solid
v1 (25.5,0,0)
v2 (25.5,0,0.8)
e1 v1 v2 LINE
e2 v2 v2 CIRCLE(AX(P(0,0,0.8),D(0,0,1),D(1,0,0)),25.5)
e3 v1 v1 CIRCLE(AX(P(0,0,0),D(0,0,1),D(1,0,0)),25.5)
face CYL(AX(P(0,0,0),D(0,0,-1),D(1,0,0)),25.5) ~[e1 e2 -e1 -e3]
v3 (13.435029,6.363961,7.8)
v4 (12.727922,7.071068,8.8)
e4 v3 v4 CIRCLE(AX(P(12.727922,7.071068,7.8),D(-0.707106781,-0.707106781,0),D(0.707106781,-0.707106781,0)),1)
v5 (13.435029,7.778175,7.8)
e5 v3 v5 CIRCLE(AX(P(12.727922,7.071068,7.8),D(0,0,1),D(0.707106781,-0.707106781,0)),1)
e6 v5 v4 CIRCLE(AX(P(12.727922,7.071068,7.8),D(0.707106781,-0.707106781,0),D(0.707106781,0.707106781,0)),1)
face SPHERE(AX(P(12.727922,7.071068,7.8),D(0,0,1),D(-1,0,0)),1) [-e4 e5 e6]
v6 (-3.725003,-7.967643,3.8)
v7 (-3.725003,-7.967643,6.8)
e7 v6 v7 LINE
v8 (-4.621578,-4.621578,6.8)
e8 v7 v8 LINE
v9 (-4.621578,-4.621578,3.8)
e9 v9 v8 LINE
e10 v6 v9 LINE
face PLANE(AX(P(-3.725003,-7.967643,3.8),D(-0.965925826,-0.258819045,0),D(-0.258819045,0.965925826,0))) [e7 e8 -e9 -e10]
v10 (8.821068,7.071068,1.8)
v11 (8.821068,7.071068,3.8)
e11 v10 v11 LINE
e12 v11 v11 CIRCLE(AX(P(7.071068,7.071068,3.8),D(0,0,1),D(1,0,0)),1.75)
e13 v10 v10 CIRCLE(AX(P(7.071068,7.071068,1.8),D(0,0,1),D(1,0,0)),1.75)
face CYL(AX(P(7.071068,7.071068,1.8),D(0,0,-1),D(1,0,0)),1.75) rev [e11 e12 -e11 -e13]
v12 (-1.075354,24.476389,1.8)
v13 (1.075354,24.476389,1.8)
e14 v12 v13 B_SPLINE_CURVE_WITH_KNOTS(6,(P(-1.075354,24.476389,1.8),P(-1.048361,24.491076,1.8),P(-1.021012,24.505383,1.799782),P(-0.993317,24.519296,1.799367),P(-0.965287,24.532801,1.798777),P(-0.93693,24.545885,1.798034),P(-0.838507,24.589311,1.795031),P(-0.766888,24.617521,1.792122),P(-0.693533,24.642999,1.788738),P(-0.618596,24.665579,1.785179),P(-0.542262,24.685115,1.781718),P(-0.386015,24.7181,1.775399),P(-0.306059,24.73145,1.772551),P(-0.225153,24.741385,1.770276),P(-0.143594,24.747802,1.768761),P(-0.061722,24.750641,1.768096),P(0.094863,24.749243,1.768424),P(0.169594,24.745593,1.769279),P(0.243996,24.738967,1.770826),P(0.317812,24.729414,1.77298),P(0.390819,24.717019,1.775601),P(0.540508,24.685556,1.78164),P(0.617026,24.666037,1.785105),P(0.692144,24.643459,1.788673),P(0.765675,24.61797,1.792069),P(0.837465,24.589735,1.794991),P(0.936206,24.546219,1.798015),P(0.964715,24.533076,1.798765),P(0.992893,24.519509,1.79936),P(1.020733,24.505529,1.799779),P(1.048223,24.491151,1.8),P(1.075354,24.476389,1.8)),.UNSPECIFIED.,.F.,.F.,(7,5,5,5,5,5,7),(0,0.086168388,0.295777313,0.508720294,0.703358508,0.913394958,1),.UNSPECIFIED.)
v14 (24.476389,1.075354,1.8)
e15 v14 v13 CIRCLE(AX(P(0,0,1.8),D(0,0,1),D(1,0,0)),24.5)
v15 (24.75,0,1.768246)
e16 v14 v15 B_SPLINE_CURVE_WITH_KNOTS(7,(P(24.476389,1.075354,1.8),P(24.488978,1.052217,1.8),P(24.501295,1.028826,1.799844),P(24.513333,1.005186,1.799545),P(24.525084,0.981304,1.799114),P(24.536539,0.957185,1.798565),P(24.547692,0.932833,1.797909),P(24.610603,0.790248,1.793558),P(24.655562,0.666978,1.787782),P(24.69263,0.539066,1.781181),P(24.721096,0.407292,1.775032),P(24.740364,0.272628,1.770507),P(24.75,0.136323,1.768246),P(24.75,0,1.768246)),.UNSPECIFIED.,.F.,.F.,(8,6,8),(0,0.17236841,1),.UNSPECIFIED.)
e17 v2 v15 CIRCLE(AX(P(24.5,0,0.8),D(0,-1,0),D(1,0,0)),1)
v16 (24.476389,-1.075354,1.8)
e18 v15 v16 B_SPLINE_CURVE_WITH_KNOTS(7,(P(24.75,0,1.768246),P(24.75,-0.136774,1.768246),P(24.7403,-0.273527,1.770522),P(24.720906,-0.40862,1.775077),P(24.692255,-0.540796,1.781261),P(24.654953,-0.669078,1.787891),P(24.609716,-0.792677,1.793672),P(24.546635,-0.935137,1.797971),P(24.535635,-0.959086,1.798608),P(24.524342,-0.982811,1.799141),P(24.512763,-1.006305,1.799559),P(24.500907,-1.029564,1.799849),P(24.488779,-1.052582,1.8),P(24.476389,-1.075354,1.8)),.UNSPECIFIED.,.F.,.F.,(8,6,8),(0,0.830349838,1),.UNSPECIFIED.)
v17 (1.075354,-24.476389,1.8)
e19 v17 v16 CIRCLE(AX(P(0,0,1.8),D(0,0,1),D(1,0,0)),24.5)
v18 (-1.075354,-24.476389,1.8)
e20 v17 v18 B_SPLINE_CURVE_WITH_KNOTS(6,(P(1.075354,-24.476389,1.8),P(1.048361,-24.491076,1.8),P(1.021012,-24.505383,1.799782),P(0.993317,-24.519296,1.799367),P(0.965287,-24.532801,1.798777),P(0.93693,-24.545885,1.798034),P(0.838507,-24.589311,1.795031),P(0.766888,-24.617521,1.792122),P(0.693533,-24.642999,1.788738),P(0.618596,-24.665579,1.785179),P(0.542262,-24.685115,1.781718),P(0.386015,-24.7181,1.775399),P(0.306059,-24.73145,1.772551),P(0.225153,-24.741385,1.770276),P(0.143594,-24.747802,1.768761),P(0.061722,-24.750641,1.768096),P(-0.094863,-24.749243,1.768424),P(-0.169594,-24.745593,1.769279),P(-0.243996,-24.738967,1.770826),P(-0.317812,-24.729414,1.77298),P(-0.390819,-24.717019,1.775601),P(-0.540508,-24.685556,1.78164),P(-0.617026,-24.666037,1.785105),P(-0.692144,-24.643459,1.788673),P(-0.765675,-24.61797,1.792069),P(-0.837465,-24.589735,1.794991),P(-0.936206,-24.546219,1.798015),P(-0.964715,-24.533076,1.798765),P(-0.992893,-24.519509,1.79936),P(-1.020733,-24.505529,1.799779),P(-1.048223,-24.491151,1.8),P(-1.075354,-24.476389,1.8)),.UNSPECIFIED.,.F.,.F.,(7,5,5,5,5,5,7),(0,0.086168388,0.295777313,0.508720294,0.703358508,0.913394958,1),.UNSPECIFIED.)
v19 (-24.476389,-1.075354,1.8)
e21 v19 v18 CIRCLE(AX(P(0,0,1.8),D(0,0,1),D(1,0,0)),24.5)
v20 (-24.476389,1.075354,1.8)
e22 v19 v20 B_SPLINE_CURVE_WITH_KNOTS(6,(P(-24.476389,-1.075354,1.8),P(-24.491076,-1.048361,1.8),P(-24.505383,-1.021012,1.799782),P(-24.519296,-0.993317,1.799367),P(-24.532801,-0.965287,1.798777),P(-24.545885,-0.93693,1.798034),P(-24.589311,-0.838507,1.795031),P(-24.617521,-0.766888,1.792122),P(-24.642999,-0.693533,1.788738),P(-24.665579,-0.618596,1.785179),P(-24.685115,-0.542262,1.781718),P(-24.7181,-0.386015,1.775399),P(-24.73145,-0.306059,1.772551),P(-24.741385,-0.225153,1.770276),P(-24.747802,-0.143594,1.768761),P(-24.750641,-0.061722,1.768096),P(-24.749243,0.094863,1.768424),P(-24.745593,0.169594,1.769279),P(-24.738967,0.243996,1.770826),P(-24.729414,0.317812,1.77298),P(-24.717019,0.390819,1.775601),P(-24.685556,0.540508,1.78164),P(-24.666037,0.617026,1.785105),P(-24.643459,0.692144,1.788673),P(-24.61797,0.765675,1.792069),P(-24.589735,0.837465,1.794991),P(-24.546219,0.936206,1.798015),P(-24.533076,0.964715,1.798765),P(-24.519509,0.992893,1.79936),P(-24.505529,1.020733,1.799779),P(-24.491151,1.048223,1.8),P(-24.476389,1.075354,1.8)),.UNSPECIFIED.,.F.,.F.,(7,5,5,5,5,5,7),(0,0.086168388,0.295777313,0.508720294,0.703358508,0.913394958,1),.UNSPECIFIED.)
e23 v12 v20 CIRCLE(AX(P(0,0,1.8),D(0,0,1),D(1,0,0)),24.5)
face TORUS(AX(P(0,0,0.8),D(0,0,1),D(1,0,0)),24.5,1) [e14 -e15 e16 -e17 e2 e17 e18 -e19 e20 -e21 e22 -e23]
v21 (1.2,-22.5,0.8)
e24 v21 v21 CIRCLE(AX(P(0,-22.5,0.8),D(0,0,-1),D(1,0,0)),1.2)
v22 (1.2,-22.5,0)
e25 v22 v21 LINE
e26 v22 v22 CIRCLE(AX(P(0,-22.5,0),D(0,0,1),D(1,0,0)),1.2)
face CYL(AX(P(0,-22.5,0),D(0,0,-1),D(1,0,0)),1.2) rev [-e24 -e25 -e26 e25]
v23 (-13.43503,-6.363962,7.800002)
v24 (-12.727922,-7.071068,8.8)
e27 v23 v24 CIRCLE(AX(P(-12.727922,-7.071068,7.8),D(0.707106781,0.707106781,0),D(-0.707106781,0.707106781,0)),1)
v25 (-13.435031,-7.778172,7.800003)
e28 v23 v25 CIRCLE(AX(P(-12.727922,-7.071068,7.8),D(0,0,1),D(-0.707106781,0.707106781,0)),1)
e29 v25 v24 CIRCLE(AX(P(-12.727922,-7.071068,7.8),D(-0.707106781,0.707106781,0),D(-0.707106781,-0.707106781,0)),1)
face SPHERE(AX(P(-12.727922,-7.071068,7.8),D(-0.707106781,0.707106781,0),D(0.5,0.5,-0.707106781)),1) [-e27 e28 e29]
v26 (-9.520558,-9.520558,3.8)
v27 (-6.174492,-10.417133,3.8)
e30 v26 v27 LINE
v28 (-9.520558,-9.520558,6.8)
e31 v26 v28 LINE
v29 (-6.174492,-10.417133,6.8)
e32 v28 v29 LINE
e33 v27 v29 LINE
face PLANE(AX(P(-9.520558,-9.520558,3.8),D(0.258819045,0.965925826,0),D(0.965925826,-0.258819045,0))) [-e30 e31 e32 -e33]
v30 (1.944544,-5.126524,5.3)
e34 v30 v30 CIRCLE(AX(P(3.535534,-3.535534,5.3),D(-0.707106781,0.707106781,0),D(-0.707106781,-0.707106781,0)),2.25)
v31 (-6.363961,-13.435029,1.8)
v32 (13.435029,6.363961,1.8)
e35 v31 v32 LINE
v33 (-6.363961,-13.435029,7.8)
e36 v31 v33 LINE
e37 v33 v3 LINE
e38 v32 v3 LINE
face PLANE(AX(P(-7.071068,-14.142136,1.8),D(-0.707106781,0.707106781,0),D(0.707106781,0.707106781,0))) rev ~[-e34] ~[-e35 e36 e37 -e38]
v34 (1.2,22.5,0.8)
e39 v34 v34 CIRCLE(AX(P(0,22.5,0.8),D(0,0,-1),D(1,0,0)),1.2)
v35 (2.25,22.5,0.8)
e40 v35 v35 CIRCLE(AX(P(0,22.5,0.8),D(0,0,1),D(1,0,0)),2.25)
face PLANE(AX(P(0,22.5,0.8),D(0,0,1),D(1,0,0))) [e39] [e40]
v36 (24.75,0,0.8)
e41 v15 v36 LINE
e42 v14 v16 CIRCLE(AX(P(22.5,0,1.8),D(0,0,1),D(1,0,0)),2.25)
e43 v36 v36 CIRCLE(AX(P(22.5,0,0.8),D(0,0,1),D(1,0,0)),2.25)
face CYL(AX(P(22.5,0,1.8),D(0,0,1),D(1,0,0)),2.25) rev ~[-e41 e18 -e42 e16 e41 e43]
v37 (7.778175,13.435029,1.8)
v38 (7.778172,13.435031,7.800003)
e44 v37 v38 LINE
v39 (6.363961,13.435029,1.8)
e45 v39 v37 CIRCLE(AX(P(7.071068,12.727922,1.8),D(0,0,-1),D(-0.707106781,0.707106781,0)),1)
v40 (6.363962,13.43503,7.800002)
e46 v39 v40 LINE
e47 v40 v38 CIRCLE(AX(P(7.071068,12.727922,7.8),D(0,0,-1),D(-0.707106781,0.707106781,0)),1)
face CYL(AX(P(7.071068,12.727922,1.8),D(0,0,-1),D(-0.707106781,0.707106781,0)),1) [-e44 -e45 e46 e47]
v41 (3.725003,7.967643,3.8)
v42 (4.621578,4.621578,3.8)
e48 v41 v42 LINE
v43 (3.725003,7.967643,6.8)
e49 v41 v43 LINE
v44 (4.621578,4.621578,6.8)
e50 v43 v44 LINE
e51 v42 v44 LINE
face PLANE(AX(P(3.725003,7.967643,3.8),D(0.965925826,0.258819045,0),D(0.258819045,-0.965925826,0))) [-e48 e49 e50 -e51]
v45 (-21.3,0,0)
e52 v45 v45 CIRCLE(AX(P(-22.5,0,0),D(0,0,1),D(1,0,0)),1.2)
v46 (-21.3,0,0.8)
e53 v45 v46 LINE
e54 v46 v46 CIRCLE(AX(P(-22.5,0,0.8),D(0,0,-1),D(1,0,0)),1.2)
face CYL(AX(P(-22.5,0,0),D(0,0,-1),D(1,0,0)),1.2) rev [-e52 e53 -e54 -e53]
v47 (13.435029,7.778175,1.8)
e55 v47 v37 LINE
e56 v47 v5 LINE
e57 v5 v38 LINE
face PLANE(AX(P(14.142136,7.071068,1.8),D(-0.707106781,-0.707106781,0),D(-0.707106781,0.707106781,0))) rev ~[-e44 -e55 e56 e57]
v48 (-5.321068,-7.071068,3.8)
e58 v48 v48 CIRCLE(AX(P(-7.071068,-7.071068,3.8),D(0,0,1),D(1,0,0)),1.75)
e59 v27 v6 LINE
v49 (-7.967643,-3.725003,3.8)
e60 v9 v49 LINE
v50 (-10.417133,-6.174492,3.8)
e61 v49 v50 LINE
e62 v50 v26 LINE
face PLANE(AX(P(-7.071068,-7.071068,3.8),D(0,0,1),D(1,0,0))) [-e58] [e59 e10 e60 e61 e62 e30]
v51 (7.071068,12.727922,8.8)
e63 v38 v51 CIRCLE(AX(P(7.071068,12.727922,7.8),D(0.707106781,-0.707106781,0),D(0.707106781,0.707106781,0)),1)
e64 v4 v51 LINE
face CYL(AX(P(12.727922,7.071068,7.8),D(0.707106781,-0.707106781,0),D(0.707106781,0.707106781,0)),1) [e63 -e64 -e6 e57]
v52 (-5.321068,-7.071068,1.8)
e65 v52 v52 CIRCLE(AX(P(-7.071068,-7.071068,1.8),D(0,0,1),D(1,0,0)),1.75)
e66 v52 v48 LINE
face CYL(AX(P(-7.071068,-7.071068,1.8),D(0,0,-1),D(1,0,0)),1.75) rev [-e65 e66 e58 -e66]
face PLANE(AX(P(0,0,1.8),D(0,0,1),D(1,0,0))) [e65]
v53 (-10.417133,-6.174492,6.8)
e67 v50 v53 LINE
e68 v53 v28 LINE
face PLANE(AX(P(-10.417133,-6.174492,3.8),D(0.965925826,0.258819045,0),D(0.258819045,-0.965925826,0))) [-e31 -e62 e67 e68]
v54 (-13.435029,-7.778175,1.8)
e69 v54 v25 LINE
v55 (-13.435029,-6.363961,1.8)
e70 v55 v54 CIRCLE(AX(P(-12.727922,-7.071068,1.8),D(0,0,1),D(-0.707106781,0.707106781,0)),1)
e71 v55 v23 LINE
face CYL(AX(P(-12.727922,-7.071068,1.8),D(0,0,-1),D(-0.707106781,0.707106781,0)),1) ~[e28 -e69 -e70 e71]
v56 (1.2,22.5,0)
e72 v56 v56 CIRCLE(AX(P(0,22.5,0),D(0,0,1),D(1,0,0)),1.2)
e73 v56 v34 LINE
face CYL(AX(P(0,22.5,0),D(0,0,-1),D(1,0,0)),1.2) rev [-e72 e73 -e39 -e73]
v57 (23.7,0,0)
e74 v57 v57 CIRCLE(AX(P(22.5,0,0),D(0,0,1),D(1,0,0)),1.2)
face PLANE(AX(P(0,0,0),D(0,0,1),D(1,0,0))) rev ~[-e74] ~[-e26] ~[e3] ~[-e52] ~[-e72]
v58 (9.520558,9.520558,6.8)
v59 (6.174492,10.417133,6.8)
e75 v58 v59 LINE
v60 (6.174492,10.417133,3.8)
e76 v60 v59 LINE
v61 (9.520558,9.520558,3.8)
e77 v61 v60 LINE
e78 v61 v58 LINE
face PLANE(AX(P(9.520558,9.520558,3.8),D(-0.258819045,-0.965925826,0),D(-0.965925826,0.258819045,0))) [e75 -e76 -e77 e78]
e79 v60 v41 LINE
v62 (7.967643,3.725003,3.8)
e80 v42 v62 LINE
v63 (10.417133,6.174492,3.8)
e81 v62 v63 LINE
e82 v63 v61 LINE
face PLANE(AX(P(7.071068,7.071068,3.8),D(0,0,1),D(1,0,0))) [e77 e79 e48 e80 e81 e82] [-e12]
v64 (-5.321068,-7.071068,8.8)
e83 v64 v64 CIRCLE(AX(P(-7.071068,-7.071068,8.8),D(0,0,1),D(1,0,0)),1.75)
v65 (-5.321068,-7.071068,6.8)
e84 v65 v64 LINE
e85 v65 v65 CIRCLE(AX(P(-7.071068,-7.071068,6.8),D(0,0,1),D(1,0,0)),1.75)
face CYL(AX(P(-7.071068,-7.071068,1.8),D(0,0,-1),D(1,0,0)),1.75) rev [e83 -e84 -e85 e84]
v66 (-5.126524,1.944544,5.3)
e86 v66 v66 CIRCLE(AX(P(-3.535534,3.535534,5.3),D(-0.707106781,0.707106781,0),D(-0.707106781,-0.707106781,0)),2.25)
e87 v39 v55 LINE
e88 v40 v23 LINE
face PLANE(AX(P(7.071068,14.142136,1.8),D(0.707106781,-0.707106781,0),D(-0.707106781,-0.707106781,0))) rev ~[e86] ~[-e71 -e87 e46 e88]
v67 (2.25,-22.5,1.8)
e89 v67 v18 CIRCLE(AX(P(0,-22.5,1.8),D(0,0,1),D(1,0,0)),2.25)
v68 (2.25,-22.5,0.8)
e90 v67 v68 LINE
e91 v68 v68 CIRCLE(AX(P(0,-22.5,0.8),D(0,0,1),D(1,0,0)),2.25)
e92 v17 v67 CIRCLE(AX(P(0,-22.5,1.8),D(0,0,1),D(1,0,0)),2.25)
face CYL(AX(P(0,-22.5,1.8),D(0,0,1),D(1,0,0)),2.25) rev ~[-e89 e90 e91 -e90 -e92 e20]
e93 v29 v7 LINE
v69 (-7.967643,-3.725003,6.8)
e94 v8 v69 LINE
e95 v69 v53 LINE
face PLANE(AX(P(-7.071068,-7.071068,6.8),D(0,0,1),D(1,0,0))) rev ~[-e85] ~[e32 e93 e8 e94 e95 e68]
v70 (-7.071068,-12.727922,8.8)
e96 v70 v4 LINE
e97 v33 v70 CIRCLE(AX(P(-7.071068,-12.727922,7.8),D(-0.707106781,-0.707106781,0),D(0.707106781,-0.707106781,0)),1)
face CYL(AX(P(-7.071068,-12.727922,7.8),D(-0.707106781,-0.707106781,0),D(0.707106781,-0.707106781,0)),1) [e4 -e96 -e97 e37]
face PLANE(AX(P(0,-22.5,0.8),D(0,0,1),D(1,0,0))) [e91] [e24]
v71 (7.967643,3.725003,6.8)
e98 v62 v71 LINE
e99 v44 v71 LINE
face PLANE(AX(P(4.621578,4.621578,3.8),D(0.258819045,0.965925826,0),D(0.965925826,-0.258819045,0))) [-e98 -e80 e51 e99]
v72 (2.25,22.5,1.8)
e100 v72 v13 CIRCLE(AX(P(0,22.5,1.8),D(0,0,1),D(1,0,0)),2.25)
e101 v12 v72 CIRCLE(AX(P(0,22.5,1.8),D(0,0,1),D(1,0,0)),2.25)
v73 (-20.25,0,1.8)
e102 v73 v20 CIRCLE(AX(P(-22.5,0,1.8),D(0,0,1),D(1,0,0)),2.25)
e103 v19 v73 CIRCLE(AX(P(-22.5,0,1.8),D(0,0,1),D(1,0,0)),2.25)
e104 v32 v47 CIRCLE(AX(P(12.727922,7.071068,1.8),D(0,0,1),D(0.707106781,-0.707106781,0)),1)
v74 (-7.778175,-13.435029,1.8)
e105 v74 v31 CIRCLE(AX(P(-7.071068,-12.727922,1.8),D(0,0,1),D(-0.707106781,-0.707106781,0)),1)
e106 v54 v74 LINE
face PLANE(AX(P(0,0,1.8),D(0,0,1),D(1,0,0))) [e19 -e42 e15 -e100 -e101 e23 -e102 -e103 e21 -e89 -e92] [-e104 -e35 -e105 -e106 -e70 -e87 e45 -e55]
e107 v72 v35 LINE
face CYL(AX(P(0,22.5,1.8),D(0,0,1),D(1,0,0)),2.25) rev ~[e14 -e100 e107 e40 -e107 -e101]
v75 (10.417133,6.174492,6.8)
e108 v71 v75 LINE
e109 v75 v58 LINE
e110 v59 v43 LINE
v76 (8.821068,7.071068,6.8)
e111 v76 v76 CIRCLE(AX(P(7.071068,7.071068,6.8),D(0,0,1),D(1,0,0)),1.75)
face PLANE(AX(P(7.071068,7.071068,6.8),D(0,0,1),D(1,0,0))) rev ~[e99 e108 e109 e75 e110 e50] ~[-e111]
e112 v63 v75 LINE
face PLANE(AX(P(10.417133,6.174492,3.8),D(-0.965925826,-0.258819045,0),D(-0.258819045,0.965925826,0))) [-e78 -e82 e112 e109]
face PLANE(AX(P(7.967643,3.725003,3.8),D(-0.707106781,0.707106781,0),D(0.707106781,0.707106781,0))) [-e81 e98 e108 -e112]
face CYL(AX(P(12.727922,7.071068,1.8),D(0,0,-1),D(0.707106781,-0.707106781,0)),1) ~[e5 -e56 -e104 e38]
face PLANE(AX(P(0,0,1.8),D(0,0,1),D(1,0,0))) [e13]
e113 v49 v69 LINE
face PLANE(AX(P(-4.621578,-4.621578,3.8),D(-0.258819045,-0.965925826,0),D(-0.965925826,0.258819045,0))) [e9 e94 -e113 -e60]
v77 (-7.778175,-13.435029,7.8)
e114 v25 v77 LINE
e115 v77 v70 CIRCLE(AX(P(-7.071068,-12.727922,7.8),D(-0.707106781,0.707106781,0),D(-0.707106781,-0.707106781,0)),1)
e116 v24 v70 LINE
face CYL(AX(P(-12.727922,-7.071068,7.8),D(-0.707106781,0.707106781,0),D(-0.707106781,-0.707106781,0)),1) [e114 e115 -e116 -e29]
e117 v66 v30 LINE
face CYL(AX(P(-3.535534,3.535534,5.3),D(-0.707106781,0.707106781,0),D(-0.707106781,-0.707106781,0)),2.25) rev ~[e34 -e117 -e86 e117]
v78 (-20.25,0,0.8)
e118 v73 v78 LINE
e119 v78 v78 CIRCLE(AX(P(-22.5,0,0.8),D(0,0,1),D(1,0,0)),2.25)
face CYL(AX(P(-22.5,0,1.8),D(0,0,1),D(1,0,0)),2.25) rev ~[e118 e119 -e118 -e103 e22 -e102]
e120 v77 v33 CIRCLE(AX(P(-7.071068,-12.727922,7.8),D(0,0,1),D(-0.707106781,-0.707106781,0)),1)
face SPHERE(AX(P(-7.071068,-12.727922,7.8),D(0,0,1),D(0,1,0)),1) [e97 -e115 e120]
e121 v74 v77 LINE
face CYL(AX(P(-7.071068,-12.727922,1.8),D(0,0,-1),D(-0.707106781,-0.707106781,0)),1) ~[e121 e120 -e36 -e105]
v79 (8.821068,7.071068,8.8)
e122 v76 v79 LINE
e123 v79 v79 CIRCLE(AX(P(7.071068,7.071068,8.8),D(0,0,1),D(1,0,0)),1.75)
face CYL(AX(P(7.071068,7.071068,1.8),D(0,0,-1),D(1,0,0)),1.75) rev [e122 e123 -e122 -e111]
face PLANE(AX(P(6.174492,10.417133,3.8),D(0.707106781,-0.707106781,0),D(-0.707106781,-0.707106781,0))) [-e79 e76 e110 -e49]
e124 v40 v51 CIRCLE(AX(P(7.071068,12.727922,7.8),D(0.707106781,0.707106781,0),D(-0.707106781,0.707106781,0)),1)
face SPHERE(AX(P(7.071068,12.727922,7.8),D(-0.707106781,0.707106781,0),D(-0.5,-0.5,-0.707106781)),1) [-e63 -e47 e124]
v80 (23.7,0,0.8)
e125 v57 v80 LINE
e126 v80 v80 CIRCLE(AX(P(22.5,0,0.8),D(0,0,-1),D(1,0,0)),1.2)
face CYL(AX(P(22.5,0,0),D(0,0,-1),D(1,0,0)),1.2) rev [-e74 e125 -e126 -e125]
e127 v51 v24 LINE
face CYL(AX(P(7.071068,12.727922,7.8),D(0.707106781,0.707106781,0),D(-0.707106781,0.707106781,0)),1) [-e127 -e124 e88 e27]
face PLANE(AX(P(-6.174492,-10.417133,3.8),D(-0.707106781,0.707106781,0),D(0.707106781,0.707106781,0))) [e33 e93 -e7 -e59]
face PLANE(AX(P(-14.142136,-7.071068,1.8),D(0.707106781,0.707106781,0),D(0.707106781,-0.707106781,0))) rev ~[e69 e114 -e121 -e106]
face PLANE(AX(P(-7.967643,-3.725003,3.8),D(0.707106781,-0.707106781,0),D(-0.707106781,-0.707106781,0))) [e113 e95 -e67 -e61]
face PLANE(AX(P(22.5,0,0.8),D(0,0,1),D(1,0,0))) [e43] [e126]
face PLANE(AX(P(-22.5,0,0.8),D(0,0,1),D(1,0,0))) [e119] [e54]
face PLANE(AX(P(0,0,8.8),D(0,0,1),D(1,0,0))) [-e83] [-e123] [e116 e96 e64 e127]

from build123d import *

# Parameters (mm, degrees)
F0_R         = 25.5
F0_R_2       = 1.2
F1_DEPTH     = 1.8
F2_R         = 2.25
F3_DEPTH     = 1
F4_R         = 1.75
F5_DEPTH     = 7
F6_START     = 2
F6_DEPTH     = 3
F7_R         = 2.25
F8_DEPTH     = 41.0634458405
F9_T1_DEPTH  = 6
F9_T3_DEPTH  = 8
F9_T5_DEPTH  = 28
F9_T7_DEPTH  = 28
F9_T9_DEPTH  = 8
F9_S13_W     = 1
F9_S13_H     = 1
F9_T14_DEPTH = 1
F9_T20_DEPTH = 1
F9_S25_W     = 1
F9_S25_H     = 1
F9_T26_DEPTH = 1
F9_T32_DEPTH = 1


# Not quite as in the source:
# - a fillet or chamfer that OpenCascade refuses, or shapes differently, is made with other operations: its cross-section is extruded or revolved along the edge and cut away or added


with BuildPart() as f1:
    # F0 (on Top) → F1 (new body)
    with BuildSketch(Plane.XY):
        Circle(F0_R)
        with Locations((0, -22.5)):
            Circle(F0_R_2, mode=Mode.SUBTRACT)
        with Locations((-22.5, 0)):
            Circle(F0_R_2, mode=Mode.SUBTRACT)
        with Locations((22.5, 0)):
            Circle(F0_R_2, mode=Mode.SUBTRACT)
        with Locations((0, 22.5)):
            Circle(F0_R_2, mode=Mode.SUBTRACT)
    extrude(amount=F1_DEPTH)

    # F2 (on face) → F3 (cut)
    with BuildSketch(Plane.XY.offset(1.8)):
        with Locations((0, -22.5)):
            Circle(F2_R)
        with Locations((-22.5, 0)):
            Circle(F2_R)
        with Locations((0, 22.5)):
            Circle(F2_R)
        with Locations((22.5, 0)):
            Circle(F2_R)
    extrude(amount=-F3_DEPTH, mode=Mode.SUBTRACT)

    # F4 (on face) → F5 (join)
    with BuildSketch(Plane.XY.offset(1.8)):
        Polygon((7.0710678119, 14.1421356237), (-14.1421356237, -7.0710678119), (-7.0710678119, -14.1421356237), (14.1421356237, 7.0710678119), align=None)
        Polygon((-6.1744923397, -10.4171330268), (-9.5205575546, -9.5205575546), (-10.4171330268, -6.1744923397), (-7.967643284, -3.7250025969), (-4.6215780691, -4.6215780691), (-3.7250025969, -7.967643284), align=None, mode=Mode.SUBTRACT)
        Polygon((3.7250025969, 7.967643284), (6.1744923397, 10.4171330268), (9.5205575546, 9.5205575546), (10.4171330268, 6.1744923397), (7.967643284, 3.7250025969), (4.6215780691, 4.6215780691), align=None, mode=Mode.SUBTRACT)
        Polygon((-10.4171330268, -6.1744923397), (-9.5205575546, -9.5205575546), (-6.1744923397, -10.4171330268), (-3.7250025969, -7.967643284), (-4.6215780691, -4.6215780691), (-7.967643284, -3.7250025969), align=None)
        with Locations((-7.0710678119, -7.0710678119)):
            Circle(F4_R, mode=Mode.SUBTRACT)
        Polygon((9.5205575546, 9.5205575546), (6.1744923397, 10.4171330268), (3.7250025969, 7.967643284), (4.6215780691, 4.6215780691), (7.967643284, 3.7250025969), (10.4171330268, 6.1744923397), align=None)
        with Locations((7.0710678119, 7.0710678119)):
            Circle(F4_R, mode=Mode.SUBTRACT)
    extrude(amount=F5_DEPTH)

    # F4 (on face) → F6 (cut)
    with BuildSketch(Plane.XY.offset(1.8).offset(F6_START)):
        Polygon((-10.4171330268, -6.1744923397), (-9.5205575546, -9.5205575546), (-6.1744923397, -10.4171330268), (-3.7250025969, -7.967643284), (-4.6215780691, -4.6215780691), (-7.967643284, -3.7250025969), align=None)
        with Locations((-7.0710678119, -7.0710678119)):
            Circle(F4_R, mode=Mode.SUBTRACT)
        Polygon((9.5205575546, 9.5205575546), (6.1744923397, 10.4171330268), (3.7250025969, 7.967643284), (4.6215780691, 4.6215780691), (7.967643284, 3.7250025969), (10.4171330268, 6.1744923397), align=None)
        with Locations((7.0710678119, 7.0710678119)):
            Circle(F4_R, mode=Mode.SUBTRACT)
    extrude(amount=F6_DEPTH, mode=Mode.SUBTRACT)

    # F7 (on face) → F8 (cut, through all)
    with BuildSketch(Plane(origin=(-3.5355339059, 3.5355339059, 0), x_dir=(-0.7071067812, -0.7071067812, 0), z_dir=(-0.7071067812, 0.7071067812, 0))):
        with Locations((0, 5.3)):
            Circle(F7_R)
    extrude(amount=-F8_DEPTH, mode=Mode.SUBTRACT)

    # F9: fillet of radius 1 on 9 edges, made by hand

    # F9_s2 → F9_t1 (cut)
    with BuildSketch(Plane.XY.offset(1.8)):
        with BuildLine():
            ThreePointArc((-13.4350288425, -6.3639610307), (-13.7279220614, -7.0710678119), (-13.4350288425, -7.7781745931))
            Line((-13.4350288425, -7.7781745931), (-14.1421356237, -7.0710678119))
            Line((-14.1421356237, -7.0710678119), (-13.4350288425, -6.3639610307))
        make_face()
        with BuildLine():
            ThreePointArc((-7.7781745931, -13.4350288425), (-7.0710678119, -13.7279220614), (-6.3639610307, -13.4350288425))
            Line((-6.3639610307, -13.4350288425), (-7.0710678119, -14.1421356237))
            Line((-7.0710678119, -14.1421356237), (-7.7781745931, -13.4350288425))
        make_face()
        with BuildLine():
            ThreePointArc((13.4350288425, 6.3639610307), (13.7279220614, 7.0710678119), (13.4350288425, 7.7781745931))
            Line((13.4350288425, 7.7781745931), (14.1421356237, 7.0710678119))
            Line((14.1421356237, 7.0710678119), (13.4350288425, 6.3639610307))
        make_face()
        with BuildLine():
            ThreePointArc((6.3639610307, 13.4350288425), (7.0710678119, 13.7279220614), (7.7781745931, 13.4350288425))
            Line((7.7781745931, 13.4350288425), (7.0710678119, 14.1421356237))
            Line((7.0710678119, 14.1421356237), (6.3639610307, 13.4350288425))
        make_face()
    extrude(amount=F9_T1_DEPTH, mode=Mode.SUBTRACT)

    # F9_s4 → F9_t3 (cut)
    with BuildSketch(Plane(origin=(-2.8284271247, 2.8284271247, 0), x_dir=(0, 0, 1), z_dir=(0.7071067812, -0.7071067812, 0))):
        with BuildLine():
            ThreePointArc((7.8, 15), (8.5071067812, 14.7071067812), (8.8, 14))
            Line((8.8, 14), (8.8, 15))
            Line((8.8, 15), (7.8, 15))
        make_face()
    extrude(amount=F9_T3_DEPTH, mode=Mode.SUBTRACT)

    # F9_s6 → F9_t5 (cut)
    with BuildSketch(Plane(origin=(9.8994949366, 9.8994949366, 0), x_dir=(0, 0, 1), z_dir=(-0.7071067812, -0.7071067812, 0))):
        with BuildLine():
            ThreePointArc((7.8, 5), (8.5071067812, 4.7071067812), (8.8, 4))
            Line((8.8, 4), (8.8, 5))
            Line((8.8, 5), (7.8, 5))
        make_face()
    extrude(amount=F9_T5_DEPTH, mode=Mode.SUBTRACT)

    # F9_s8 → F9_t7 (cut)
    with BuildSketch(Plane(origin=(-9.8994949366, -9.8994949366, 0), x_dir=(0, 0, 1), z_dir=(0.7071067812, 0.7071067812, 0))):
        with BuildLine():
            ThreePointArc((7.8, 5), (8.5071067812, 4.7071067812), (8.8, 4))
            Line((8.8, 4), (8.8, 5))
            Line((8.8, 5), (7.8, 5))
        make_face()
    extrude(amount=F9_T7_DEPTH, mode=Mode.SUBTRACT)

    # F9_s10 → F9_t9 (cut)
    with BuildSketch(Plane(origin=(2.8284271247, -2.8284271247, 0), x_dir=(0, 0, 1), z_dir=(-0.7071067812, 0.7071067812, 0))):
        with BuildLine():
            ThreePointArc((7.8, 15), (8.5071067812, 14.7071067812), (8.8, 14))
            Line((8.8, 14), (8.8, 15))
            Line((8.8, 15), (7.8, 15))
        make_face()
    extrude(amount=F9_T9_DEPTH, mode=Mode.SUBTRACT)


with BuildPart() as f9_tool12:
    # F9_s13 → F9_t14 (new body)
    with BuildSketch(Plane(origin=(-2.8284271247, 2.8284271247, 0), x_dir=(0, 0, 1), z_dir=(-0.7071067812, 0.7071067812, 0))):
        with Locations((8.3, -14.5)):
            Rectangle(F9_S13_W, F9_S13_H)
    extrude(amount=F9_T14_DEPTH)

    # F9_s15 → F9_t16 (revolve, cut)
    with BuildSketch(Plane(origin=(-12.7279220614, -7.0710678119, 7.8), x_dir=(0.5, 0.5, -0.7071067812), z_dir=(0.5, 0.5, 0.7071067812))):
        with BuildLine():
            ThreePointArc((0, -1), (1, 0), (0, 1))
            Line((0, 1), (0, -1))
        make_face()
    revolve(axis=Axis((-12.7279220614, -7.0710678119, 7.8), (-0.7071067812, 0.7071067812, 0)), mode=Mode.SUBTRACT)


with BuildPart() as f1_1:
    add(f1.part)

    # F9_t11: cut F9_tool12
    add(f9_tool12.part, mode=Mode.SUBTRACT)


with BuildPart() as f9_tool18:
    # F9_s19 → F9_t20 (new body)
    with BuildSketch(Plane.XY.offset(7.8)):
        Polygon((-7.0710678119, -12.7279220614), (-7.7781745931, -13.4350288425), (-7.0710678119, -14.1421356237), (-6.3639610307, -13.4350288425), align=None)
    extrude(amount=F9_T20_DEPTH)

    # F9_s21 → F9_t22 (revolve, cut)
    with BuildSketch(Plane(origin=(-7.0710678119, -12.7279220614, 7.8), x_dir=(0, 1, 0), z_dir=(1, 0, 0))):
        with BuildLine():
            ThreePointArc((0, -1), (1, 0), (0, 1))
            Line((0, 1), (0, -1))
        make_face()
    revolve(axis=Axis((-7.0710678119, -12.7279220614, 7.8), (0, 0, 1)), mode=Mode.SUBTRACT)


with BuildPart() as f1_2:
    add(f1_1.part)

    # F9_t17: cut F9_tool18
    add(f9_tool18.part, mode=Mode.SUBTRACT)


with BuildPart() as f9_tool24:
    # F9_s25 → F9_t26 (new body)
    with BuildSketch(Plane(origin=(-2.8284271247, 2.8284271247, 0), x_dir=(0, 0, 1), z_dir=(-0.7071067812, 0.7071067812, 0))):
        with Locations((8.3, 14.5)):
            Rectangle(F9_S25_W, F9_S25_H)
    extrude(amount=F9_T26_DEPTH)

    # F9_s27 → F9_t28 (revolve, cut)
    with BuildSketch(Plane(origin=(7.0710678119, 12.7279220614, 7.8), x_dir=(-0.5, -0.5, -0.7071067812), z_dir=(0.5, 0.5, -0.7071067812))):
        with BuildLine():
            ThreePointArc((0, -1), (1, 0), (0, 1))
            Line((0, 1), (0, -1))
        make_face()
    revolve(axis=Axis((7.0710678119, 12.7279220614, 7.8), (-0.7071067812, 0.7071067812, 0)), mode=Mode.SUBTRACT)


with BuildPart() as f1_3:
    add(f1_2.part)

    # F9_t23: cut F9_tool24
    add(f9_tool24.part, mode=Mode.SUBTRACT)


with BuildPart() as f9_tool30:
    # F9_s31 → F9_t32 (new body)
    with BuildSketch(Plane.XY.offset(7.8)):
        Polygon((12.7279220614, 7.0710678119), (13.4350288425, 6.3639610307), (14.1421356237, 7.0710678119), (13.4350288425, 7.7781745931), align=None)
    extrude(amount=F9_T32_DEPTH)

    # F9_s33 → F9_t34 (revolve, cut)
    with BuildSketch(Plane(origin=(12.7279220614, 7.0710678119, 7.8), x_dir=(-1, 0, 0), z_dir=(0, 1, 0))):
        with BuildLine():
            ThreePointArc((0, -1), (1, 0), (0, 1))
            Line((0, 1), (0, -1))
        make_face()
    revolve(axis=Axis((12.7279220614, 7.0710678119, 7.8), (0, 0, 1)), mode=Mode.SUBTRACT)


with BuildPart() as f1_4:
    add(f1_3.part)

    # F9_t29: cut F9_tool30
    add(f9_tool30.part, mode=Mode.SUBTRACT)

    # F9_s35 → F9_t36 (revolve, cut)
    with BuildSketch(Plane.XZ):
        with BuildLine():
            ThreePointArc((25.5, 0.8), (25.2071067812, 1.5071067812), (24.5, 1.8))
            Line((24.5, 1.8), (25.5, 1.8))
            Line((25.5, 1.8), (25.5, 0.8))
        make_face()
    revolve(axis=Axis((0, 0, 1.8), (0, 0, 1)), mode=Mode.SUBTRACT)


solid = f1_4.part
